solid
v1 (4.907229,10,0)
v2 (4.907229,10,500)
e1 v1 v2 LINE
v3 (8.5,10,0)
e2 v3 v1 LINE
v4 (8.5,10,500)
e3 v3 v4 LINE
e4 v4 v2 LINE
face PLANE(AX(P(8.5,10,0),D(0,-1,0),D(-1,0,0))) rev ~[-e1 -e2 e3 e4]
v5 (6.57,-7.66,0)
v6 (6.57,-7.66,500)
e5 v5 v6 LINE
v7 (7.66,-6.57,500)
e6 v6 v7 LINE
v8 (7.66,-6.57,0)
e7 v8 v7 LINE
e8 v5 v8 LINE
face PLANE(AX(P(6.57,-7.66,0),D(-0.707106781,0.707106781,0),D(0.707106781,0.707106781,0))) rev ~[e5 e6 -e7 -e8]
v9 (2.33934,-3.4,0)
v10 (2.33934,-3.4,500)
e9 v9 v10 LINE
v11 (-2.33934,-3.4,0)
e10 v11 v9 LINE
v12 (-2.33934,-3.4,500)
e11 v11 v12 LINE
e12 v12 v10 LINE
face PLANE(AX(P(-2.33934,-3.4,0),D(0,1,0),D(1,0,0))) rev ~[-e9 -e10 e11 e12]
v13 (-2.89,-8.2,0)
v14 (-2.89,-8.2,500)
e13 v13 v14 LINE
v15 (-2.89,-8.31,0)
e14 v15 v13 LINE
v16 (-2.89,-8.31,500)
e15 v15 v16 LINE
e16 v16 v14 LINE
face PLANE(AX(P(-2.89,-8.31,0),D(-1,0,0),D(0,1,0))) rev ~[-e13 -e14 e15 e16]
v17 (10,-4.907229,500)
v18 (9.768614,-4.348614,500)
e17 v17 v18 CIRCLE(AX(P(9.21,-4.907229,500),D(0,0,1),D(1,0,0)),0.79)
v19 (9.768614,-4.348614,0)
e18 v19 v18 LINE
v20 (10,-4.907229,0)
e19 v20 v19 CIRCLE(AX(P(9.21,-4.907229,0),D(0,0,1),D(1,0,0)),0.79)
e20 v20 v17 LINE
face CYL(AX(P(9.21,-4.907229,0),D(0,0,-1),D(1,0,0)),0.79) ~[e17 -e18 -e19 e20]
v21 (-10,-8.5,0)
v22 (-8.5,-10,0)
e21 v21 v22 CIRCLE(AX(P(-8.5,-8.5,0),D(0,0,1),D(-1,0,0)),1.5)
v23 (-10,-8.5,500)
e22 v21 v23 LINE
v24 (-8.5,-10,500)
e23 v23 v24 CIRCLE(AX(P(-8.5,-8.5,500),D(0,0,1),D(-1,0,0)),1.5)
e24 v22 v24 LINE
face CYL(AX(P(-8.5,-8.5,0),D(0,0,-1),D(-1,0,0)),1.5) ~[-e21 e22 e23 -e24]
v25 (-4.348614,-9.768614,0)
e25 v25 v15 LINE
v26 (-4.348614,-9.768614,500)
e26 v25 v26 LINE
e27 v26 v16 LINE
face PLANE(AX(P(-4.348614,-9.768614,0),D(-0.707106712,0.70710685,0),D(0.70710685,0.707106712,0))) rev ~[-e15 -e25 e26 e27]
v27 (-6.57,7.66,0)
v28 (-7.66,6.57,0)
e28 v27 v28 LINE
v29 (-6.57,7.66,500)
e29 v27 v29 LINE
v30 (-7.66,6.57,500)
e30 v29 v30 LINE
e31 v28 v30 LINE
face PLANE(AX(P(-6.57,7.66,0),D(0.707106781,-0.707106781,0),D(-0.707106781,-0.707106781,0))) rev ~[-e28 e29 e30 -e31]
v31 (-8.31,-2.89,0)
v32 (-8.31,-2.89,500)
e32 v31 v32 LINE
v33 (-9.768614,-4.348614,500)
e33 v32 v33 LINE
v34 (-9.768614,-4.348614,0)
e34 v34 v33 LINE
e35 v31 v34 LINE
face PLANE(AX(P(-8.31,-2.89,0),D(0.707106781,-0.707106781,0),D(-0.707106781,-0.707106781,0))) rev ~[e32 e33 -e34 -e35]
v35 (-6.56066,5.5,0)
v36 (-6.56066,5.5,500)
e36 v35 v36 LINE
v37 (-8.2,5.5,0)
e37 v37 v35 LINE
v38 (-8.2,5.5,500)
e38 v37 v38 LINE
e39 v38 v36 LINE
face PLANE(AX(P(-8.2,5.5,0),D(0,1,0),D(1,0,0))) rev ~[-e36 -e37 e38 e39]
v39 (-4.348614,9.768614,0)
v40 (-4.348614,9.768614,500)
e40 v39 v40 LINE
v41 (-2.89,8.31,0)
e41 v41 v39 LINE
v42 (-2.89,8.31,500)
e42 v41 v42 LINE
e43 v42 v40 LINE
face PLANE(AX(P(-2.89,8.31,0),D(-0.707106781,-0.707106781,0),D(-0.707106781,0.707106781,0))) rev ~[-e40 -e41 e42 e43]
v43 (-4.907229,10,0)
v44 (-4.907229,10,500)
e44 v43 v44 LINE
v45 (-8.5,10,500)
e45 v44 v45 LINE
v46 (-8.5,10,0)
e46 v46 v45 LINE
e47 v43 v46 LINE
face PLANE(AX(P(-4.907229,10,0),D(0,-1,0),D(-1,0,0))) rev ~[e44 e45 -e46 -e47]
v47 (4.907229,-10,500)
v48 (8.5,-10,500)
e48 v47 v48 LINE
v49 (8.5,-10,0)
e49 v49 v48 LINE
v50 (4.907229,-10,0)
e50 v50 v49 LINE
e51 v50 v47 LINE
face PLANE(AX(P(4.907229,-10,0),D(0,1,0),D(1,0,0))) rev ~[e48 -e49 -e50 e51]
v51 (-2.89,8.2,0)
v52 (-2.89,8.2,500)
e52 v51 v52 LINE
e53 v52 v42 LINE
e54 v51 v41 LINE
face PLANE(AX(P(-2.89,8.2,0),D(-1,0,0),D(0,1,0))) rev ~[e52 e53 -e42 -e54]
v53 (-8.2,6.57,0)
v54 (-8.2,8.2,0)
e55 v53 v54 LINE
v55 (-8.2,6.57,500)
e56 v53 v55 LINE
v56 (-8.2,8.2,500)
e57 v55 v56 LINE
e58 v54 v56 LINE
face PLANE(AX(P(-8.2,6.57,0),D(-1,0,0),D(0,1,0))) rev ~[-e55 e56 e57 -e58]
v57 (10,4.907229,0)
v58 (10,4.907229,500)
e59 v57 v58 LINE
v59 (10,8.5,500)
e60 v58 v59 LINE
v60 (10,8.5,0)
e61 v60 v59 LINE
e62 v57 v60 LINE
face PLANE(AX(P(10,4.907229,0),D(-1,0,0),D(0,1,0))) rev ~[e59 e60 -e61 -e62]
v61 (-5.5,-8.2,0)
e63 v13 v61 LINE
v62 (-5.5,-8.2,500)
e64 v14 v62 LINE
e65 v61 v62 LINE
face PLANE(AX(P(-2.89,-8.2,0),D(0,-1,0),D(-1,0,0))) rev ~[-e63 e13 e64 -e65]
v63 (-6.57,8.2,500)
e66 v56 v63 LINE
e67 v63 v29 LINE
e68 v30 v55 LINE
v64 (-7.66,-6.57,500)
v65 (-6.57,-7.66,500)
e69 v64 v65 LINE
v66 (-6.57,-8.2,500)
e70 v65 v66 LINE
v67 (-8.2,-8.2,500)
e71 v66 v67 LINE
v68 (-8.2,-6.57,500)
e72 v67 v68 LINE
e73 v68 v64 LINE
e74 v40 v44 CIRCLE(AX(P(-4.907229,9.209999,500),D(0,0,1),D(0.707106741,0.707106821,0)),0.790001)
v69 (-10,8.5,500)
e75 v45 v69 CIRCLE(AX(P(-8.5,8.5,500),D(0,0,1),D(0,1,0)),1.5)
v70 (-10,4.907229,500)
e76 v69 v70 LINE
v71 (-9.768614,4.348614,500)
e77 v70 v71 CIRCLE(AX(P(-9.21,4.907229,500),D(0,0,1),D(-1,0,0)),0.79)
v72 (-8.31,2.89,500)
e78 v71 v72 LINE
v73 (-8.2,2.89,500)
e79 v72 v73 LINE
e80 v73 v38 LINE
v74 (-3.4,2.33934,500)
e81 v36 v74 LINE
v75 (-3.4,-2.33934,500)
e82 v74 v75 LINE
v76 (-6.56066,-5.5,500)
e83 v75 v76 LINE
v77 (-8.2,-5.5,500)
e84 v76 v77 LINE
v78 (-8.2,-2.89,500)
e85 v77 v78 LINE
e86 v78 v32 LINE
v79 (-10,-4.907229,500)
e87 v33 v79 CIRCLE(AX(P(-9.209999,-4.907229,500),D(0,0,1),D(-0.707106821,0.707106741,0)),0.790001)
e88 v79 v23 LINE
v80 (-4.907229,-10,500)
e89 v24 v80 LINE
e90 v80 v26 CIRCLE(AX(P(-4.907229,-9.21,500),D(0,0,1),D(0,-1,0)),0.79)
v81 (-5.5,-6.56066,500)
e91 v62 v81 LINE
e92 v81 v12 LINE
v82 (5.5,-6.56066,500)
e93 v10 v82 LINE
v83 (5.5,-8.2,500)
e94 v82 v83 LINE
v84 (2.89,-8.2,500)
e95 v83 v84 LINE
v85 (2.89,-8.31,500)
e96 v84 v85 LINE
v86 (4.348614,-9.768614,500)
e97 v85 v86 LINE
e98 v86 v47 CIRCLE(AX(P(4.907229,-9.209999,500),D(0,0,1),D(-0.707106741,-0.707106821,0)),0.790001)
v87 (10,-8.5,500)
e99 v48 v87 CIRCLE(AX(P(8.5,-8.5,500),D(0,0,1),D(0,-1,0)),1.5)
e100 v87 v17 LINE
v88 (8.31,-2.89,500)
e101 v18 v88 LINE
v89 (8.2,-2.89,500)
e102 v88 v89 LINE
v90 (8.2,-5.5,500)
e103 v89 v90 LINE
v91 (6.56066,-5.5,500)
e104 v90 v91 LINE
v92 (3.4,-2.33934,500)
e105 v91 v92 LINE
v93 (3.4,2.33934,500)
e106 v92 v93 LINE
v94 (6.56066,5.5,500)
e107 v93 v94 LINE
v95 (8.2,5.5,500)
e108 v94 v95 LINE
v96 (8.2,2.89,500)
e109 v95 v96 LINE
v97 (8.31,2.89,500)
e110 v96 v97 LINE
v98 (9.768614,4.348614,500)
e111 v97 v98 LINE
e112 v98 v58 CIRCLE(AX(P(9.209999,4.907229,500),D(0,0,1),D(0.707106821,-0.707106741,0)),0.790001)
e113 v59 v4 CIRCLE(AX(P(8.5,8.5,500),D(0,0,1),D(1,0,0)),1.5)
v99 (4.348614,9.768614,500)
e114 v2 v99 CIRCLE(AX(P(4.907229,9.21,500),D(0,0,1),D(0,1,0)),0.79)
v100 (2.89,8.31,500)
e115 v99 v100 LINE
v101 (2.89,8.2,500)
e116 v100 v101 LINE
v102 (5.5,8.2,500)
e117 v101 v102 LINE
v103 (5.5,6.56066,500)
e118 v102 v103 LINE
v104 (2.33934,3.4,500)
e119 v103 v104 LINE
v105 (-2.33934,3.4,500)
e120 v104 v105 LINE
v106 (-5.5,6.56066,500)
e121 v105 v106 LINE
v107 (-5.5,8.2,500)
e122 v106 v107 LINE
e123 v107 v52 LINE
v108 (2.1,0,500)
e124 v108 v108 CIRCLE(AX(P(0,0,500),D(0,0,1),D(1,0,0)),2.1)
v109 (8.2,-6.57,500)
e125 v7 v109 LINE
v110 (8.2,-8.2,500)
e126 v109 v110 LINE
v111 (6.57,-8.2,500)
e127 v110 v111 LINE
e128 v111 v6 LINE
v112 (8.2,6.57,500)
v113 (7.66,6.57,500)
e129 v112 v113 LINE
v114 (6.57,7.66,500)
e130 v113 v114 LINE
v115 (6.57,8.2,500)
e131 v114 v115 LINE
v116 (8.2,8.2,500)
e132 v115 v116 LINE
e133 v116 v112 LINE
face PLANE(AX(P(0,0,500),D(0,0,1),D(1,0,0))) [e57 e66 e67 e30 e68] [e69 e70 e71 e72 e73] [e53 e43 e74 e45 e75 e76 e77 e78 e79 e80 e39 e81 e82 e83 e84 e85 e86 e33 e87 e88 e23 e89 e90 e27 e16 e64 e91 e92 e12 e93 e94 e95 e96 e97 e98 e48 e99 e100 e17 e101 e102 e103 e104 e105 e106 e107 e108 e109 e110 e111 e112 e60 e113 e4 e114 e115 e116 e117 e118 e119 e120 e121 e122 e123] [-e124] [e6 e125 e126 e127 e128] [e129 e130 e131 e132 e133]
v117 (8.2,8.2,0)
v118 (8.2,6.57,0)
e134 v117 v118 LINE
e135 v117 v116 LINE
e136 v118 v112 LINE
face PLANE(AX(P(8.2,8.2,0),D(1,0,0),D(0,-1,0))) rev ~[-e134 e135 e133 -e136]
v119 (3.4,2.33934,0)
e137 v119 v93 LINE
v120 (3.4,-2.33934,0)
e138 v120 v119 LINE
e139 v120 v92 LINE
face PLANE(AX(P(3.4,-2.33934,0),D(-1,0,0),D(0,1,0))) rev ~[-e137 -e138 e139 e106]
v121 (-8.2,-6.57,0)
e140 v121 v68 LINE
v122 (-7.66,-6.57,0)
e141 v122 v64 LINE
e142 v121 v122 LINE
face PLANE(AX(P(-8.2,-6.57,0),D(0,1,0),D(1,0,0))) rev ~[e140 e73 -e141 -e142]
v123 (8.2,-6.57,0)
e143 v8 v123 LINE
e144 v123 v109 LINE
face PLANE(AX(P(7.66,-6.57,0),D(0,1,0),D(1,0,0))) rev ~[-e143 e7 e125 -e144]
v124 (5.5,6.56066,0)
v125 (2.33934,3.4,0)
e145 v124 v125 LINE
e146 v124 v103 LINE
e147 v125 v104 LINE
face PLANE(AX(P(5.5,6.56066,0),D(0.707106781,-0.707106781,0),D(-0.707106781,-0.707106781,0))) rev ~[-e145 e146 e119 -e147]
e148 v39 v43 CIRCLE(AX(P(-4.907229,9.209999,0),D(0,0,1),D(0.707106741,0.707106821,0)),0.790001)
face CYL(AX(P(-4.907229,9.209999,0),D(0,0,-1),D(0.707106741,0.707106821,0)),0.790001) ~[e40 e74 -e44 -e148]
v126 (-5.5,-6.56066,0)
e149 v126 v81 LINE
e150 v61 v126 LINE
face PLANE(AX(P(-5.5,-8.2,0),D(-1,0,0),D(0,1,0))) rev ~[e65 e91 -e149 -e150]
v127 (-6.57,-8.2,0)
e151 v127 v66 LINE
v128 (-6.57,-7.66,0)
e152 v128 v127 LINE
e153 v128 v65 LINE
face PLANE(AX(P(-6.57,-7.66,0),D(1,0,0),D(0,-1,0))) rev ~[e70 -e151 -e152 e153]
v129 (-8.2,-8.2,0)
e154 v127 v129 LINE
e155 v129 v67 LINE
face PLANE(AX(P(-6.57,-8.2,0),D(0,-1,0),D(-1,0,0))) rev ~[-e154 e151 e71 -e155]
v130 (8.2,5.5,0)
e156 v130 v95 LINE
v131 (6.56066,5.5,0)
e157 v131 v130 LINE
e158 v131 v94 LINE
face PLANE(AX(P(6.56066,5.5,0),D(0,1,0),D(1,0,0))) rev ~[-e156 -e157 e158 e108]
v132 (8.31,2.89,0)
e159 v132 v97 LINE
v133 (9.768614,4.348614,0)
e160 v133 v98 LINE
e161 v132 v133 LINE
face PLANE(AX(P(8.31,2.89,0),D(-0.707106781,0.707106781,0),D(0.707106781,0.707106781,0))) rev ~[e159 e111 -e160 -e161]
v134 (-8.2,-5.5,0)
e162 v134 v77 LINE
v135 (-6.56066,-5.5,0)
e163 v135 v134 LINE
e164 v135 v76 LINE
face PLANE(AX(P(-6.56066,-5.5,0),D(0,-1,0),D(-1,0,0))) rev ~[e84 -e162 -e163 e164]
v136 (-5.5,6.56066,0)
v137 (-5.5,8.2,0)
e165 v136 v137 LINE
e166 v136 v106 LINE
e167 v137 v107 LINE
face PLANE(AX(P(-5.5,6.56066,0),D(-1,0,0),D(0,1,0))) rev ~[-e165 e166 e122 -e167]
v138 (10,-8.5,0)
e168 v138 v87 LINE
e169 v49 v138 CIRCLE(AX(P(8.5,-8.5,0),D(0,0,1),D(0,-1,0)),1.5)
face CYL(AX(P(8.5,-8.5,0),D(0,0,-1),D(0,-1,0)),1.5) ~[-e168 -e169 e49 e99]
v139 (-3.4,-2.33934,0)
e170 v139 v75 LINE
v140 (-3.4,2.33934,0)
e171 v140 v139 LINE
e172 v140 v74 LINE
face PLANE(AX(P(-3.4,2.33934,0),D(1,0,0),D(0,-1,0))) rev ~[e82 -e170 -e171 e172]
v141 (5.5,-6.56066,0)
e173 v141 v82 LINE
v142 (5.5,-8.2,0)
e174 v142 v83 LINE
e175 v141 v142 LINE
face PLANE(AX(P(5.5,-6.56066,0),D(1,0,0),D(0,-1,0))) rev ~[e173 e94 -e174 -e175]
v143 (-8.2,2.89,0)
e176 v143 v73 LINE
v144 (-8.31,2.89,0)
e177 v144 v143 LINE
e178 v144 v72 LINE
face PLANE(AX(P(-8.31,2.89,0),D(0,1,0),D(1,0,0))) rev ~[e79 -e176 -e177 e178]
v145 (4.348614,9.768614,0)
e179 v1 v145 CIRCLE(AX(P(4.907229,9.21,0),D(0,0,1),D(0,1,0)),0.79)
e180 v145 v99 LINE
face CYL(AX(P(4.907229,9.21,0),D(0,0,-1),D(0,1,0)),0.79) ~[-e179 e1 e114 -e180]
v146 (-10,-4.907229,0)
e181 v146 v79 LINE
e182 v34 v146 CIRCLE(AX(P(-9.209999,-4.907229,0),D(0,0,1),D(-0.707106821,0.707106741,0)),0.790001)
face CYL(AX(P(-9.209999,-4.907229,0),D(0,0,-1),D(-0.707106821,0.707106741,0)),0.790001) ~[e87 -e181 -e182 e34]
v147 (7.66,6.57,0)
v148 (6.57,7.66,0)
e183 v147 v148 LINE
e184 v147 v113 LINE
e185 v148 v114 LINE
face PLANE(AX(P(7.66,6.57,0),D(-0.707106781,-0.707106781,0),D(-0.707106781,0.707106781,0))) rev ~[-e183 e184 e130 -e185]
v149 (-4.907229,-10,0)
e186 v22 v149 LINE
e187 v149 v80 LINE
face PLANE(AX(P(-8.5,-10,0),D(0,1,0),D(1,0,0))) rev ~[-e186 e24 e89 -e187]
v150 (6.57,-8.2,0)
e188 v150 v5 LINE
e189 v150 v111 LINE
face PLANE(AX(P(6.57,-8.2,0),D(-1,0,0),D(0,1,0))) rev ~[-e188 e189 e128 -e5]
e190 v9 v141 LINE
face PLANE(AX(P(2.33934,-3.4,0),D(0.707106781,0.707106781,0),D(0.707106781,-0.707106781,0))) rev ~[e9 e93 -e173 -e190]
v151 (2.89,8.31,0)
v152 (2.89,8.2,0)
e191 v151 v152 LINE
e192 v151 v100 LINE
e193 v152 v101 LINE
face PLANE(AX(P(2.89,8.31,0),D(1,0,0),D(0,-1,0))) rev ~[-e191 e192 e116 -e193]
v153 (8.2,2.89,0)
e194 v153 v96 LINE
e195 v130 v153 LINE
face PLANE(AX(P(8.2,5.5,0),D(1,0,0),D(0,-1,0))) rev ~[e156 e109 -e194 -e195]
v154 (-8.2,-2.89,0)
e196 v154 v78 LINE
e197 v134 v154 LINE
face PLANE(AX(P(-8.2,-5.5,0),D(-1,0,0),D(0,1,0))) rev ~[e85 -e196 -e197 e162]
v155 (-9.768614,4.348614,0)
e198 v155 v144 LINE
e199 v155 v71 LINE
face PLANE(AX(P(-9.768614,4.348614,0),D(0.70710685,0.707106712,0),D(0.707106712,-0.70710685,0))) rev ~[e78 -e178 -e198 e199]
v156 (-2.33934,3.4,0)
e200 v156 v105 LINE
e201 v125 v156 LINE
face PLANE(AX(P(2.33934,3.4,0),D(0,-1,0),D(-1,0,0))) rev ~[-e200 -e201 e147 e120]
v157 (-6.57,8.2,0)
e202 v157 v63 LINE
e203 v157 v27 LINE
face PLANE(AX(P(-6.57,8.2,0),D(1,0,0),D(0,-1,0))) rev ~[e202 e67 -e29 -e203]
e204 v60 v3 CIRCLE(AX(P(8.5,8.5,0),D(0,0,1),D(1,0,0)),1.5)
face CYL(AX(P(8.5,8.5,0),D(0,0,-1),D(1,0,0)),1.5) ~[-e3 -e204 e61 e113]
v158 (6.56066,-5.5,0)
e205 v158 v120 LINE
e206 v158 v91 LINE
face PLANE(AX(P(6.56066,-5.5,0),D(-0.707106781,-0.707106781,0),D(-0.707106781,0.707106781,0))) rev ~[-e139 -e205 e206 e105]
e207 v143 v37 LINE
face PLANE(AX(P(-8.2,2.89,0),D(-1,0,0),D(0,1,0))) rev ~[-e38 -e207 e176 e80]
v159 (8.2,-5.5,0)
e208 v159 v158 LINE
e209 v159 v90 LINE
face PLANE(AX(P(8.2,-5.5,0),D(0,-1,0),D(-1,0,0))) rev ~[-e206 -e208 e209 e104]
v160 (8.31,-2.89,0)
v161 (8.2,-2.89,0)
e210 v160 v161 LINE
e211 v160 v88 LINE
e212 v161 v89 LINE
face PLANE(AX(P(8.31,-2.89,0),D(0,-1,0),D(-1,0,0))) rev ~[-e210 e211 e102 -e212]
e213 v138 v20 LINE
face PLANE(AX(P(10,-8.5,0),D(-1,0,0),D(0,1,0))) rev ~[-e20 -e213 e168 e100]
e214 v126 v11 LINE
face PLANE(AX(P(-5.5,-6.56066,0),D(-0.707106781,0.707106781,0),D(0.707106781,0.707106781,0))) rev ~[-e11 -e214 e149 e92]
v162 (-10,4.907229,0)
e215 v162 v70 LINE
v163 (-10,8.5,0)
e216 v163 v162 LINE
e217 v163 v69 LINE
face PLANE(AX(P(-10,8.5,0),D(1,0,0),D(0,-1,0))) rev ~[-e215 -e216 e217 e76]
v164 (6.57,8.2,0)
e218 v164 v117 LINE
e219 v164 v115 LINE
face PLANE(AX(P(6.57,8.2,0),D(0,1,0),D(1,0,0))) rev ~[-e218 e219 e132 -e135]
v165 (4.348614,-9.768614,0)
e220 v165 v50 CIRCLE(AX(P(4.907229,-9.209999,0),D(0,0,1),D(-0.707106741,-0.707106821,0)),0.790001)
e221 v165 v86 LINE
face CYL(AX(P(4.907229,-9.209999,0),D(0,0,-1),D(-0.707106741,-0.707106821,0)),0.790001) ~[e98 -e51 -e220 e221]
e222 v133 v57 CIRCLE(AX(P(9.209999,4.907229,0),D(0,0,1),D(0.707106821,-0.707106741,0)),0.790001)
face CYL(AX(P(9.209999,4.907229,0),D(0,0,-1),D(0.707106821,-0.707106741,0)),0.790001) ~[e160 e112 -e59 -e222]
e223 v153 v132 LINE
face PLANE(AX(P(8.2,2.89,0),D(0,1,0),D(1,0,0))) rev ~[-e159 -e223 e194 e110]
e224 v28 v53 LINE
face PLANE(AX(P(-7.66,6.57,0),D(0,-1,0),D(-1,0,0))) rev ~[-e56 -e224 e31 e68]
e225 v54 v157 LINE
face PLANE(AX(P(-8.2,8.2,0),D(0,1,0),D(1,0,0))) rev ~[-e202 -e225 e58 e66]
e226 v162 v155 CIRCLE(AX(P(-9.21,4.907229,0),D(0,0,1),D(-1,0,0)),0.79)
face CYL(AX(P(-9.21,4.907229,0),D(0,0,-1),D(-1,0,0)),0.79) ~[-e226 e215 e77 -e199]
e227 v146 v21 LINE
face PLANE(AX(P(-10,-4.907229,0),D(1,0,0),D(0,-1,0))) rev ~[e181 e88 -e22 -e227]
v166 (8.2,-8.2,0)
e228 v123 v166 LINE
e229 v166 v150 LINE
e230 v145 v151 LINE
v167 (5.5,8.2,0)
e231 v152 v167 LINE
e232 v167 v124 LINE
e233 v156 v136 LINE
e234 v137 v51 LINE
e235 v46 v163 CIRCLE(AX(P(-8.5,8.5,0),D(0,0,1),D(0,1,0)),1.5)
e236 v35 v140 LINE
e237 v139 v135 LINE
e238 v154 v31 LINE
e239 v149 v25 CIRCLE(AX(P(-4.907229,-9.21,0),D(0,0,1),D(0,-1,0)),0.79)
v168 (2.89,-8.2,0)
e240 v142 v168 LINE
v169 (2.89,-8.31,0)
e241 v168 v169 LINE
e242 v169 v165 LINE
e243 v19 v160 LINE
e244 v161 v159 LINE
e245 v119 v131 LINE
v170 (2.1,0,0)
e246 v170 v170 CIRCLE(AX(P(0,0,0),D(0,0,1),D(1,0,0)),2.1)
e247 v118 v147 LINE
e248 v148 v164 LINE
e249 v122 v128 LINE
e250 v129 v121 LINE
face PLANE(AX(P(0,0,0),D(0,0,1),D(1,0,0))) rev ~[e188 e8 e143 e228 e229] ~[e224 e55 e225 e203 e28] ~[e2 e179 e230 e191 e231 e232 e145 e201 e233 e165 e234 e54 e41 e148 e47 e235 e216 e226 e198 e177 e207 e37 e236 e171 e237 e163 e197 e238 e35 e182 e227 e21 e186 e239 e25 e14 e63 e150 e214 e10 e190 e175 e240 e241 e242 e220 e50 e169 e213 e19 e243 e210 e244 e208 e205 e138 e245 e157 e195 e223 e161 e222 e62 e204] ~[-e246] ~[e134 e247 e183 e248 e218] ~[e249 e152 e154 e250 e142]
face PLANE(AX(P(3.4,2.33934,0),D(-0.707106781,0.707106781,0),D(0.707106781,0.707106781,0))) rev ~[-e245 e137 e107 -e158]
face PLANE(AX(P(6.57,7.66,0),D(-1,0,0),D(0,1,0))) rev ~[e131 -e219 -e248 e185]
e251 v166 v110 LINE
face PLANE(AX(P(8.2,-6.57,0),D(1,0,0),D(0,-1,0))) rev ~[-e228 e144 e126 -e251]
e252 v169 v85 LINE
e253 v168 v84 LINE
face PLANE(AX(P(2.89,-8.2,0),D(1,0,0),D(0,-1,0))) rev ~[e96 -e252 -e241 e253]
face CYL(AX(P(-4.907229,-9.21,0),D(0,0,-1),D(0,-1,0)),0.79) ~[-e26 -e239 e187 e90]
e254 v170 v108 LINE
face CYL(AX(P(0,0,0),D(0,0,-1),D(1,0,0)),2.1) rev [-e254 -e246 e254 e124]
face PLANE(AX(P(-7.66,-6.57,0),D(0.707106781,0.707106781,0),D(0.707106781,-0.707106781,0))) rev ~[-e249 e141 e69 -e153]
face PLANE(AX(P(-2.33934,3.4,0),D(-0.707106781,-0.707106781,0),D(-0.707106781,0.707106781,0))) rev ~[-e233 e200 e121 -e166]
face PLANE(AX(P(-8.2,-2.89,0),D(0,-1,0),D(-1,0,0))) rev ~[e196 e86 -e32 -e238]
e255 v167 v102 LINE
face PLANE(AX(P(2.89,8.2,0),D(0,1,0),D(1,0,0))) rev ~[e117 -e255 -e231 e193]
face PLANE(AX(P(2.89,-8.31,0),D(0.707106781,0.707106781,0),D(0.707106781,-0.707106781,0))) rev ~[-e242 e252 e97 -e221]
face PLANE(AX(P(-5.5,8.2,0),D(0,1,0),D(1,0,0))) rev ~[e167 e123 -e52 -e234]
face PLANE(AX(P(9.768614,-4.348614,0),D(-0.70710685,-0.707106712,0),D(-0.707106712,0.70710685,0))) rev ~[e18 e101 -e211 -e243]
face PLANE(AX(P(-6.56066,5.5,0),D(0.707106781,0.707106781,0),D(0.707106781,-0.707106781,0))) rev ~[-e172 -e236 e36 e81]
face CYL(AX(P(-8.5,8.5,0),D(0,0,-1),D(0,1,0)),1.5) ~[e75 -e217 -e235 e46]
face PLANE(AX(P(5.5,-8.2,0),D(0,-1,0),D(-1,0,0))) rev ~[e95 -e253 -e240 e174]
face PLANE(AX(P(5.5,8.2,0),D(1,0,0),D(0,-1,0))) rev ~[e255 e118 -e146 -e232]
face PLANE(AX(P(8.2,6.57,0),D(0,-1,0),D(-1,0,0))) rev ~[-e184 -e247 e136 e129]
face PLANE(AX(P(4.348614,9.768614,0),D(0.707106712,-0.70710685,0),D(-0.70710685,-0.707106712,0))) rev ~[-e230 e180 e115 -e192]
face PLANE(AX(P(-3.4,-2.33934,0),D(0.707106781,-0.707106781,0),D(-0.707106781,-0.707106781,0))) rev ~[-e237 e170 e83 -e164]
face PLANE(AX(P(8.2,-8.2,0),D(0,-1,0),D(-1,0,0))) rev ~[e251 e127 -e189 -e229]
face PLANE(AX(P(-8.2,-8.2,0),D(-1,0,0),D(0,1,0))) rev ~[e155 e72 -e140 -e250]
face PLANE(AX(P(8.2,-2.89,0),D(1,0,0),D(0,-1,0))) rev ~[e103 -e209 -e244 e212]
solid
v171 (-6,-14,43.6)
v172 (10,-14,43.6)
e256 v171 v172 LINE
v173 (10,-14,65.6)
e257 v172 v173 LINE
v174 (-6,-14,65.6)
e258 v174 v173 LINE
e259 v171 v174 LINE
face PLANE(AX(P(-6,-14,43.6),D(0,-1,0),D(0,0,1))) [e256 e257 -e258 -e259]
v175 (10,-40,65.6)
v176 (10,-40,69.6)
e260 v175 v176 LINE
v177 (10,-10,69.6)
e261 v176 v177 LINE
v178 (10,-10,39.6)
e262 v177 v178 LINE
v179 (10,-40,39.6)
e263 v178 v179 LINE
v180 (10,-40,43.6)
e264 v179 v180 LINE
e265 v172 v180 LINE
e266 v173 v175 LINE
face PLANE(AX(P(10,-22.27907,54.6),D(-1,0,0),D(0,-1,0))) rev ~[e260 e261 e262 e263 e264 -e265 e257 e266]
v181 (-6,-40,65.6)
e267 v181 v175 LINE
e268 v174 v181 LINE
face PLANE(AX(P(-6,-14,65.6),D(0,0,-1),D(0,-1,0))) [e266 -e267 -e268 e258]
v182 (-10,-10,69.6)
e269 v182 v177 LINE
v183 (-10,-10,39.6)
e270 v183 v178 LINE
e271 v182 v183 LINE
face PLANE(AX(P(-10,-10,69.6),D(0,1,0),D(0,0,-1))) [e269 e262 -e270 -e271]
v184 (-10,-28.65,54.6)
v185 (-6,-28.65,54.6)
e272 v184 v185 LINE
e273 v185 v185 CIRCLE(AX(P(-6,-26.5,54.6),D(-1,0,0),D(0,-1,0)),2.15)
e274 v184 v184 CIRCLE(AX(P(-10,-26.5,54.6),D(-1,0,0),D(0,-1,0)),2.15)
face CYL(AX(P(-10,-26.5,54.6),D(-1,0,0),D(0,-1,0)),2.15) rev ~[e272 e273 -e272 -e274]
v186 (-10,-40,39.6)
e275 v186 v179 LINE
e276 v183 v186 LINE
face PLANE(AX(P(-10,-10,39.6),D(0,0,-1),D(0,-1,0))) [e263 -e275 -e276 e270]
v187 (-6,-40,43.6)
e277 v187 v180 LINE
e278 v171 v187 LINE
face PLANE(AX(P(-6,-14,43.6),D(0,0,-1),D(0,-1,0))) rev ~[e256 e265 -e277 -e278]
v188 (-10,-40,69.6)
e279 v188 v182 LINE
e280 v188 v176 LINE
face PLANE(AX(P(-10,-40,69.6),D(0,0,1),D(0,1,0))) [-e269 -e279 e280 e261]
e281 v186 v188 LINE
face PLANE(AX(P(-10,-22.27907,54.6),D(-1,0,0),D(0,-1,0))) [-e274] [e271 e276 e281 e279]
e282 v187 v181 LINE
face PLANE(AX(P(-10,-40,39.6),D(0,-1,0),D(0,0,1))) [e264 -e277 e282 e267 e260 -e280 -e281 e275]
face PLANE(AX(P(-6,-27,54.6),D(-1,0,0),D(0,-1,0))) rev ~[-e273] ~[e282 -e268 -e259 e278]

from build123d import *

# Parameters (mm, degrees)
F0_R     = 2.1
F1_DEPTH = 500
F3_W     = 26
F3_H     = 22
F3_R     = 2.15
F4_DEPTH = 20
F7_START = -4
F7_DEPTH = 16


# Not quite as in the source:
# - ends of sketch curves that miss each other by under 0.0002 mm in the source are joined
# - a feature of the source that left no trace in its solid (it failed there, or was rolled back) is left out


with BuildPart() as f1:
    # F0 (on Top) → F1 (new body)
    with BuildSketch(Plane.XY):
        with BuildLine():
            Line((-8.2, 5.5), (-6.56066, 5.5))
            Line((-6.56066, 5.5), (-3.4, 2.33934))
            Line((-3.4, 2.33934), (-3.4, -2.33934))
            Line((-3.4, -2.33934), (-6.56066, -5.5))
            Line((-6.56066, -5.5), (-8.2, -5.5))
            Line((-8.2, -5.5), (-8.2, -2.89))
            Line((-8.2, -2.89), (-8.31, -2.89))
            Line((-8.31, -2.89), (-9.768614, -4.348614))
            ThreePointArc((-9.768614, -4.348614), (-9.9398646954, -4.6049087618), (-10, -4.907229))
            Line((-10, -4.907229), (-10, -8.5))
            ThreePointArc((-10, -8.5), (-9.5606601718, -9.5606601718), (-8.5, -10))
            Line((-8.5, -10), (-4.907229, -10))
            ThreePointArc((-4.907229, -10), (-4.6049087618, -9.9398646954), (-4.3486141429, -9.7686138571))
            Line((-4.3486141429, -9.7686138571), (-2.89, -8.31))
            Line((-2.89, -8.31), (-2.89, -8.2))
            Line((-2.89, -8.2), (-5.5, -8.2))
            Line((-5.5, -8.2), (-5.5, -6.56066))
            Line((-5.5, -6.56066), (-2.33934, -3.4))
            Line((-2.33934, -3.4), (2.33934, -3.4))
            Line((2.33934, -3.4), (5.5, -6.56066))
            Line((5.5, -6.56066), (5.5, -8.2))
            Line((5.5, -8.2), (2.89, -8.2))
            Line((2.89, -8.2), (2.89, -8.31))
            Line((2.89, -8.31), (4.348614, -9.768614))
            ThreePointArc((4.348614, -9.768614), (4.6049087618, -9.9398646954), (4.907229, -10))
            Line((4.907229, -10), (8.5, -10))
            ThreePointArc((8.5, -10), (9.5606601718, -9.5606601718), (10, -8.5))
            Line((10, -8.5), (10, -4.907229))
            ThreePointArc((10, -4.907229), (9.9398646954, -4.6049087618), (9.7686138571, -4.3486141429))
            Line((9.7686138571, -4.3486141429), (8.31, -2.89))
            Line((8.31, -2.89), (8.2, -2.89))
            Line((8.2, -2.89), (8.2, -5.5))
            Line((8.2, -5.5), (6.56066, -5.5))
            Line((6.56066, -5.5), (3.4, -2.33934))
            Line((3.4, -2.33934), (3.4, 2.33934))
            Line((3.4, 2.33934), (6.56066, 5.5))
            Line((6.56066, 5.5), (8.2, 5.5))
            Line((8.2, 5.5), (8.2, 2.89))
            Line((8.2, 2.89), (8.31, 2.89))
            Line((8.31, 2.89), (9.768614, 4.348614))
            ThreePointArc((9.768614, 4.348614), (9.9398646954, 4.6049087618), (10, 4.907229))
            Line((10, 4.907229), (10, 8.5))
            ThreePointArc((10, 8.5), (9.5606601718, 9.5606601718), (8.5, 10))
            Line((8.5, 10), (4.907229, 10))
            ThreePointArc((4.907229, 10), (4.6049087618, 9.9398646954), (4.3486141429, 9.7686138571))
            Line((4.3486141429, 9.7686138571), (2.89, 8.31))
            Line((2.89, 8.31), (2.89, 8.2))
            Line((2.89, 8.2), (5.5, 8.2))
            Line((5.5, 8.2), (5.5, 6.56066))
            Line((5.5, 6.56066), (2.33934, 3.4))
            Line((2.33934, 3.4), (-2.33934, 3.4))
            Line((-2.33934, 3.4), (-5.5, 6.56066))
            Line((-5.5, 6.56066), (-5.5, 8.2))
            Line((-5.5, 8.2), (-2.89, 8.2))
            Line((-2.89, 8.2), (-2.89, 8.31))
            Line((-2.89, 8.31), (-4.348614, 9.768614))
            ThreePointArc((-4.348614, 9.768614), (-4.6049087618, 9.9398646954), (-4.907229, 10))
            Line((-4.907229, 10), (-8.5, 10))
            ThreePointArc((-8.5, 10), (-9.5606601718, 9.5606601718), (-10, 8.5))
            Line((-10, 8.5), (-10, 4.907229))
            ThreePointArc((-10, 4.907229), (-9.9398646954, 4.6049087618), (-9.7686138571, 4.3486141429))
            Line((-9.7686138571, 4.3486141429), (-8.31, 2.89))
            Line((-8.31, 2.89), (-8.2, 2.89))
            Line((-8.2, 2.89), (-8.2, 5.5))
        make_face()
        Polygon((-6.57, -8.2), (-8.2, -8.2), (-8.2, -6.57), (-7.66, -6.57), (-6.57, -7.66), align=None, mode=Mode.SUBTRACT)
        Polygon((6.57, -7.66), (7.66, -6.57), (8.2, -6.57), (8.2, -8.2), (6.57, -8.2), align=None, mode=Mode.SUBTRACT)
        Polygon((-6.57, 7.66), (-7.66, 6.57), (-8.2, 6.57), (-8.2, 8.2), (-6.57, 8.2), align=None, mode=Mode.SUBTRACT)
        Circle(F0_R, mode=Mode.SUBTRACT)
        Polygon((6.57, 8.2), (8.2, 8.2), (8.2, 6.57), (7.66, 6.57), (6.57, 7.66), align=None, mode=Mode.SUBTRACT)
    extrude(amount=F1_DEPTH)


with BuildPart() as f4:
    # F3 (on face) → F4 (new body)
    with BuildSketch(Plane(origin=(-10, 0, 0), x_dir=(0, -1, 0), z_dir=(-1, 0, 0))):
        Polygon((40, 69.6), (10, 69.6), (10, 39.6), (40, 39.6), (40, 43.6), (14, 43.6), (14, 65.6), (40, 65.6), align=None)
        with Locations((27, 54.6)):
            Rectangle(F3_W, F3_H)
        with Locations((26.5, 54.6)):
            Circle(F3_R, mode=Mode.SUBTRACT)
    extrude(amount=-F4_DEPTH)

    # F3 (on face) → F7 (cut)
    with BuildSketch(Plane(origin=(-10, 0, 0), x_dir=(0, -1, 0), z_dir=(-1, 0, 0)).offset(F7_START)):
        with Locations((27, 54.6)):
            Rectangle(F3_W, F3_H)
        with Locations((26.5, 54.6)):
            Circle(F3_R, mode=Mode.SUBTRACT)
    extrude(amount=-F7_DEPTH, mode=Mode.SUBTRACT)


solid = Compound([f1.part, f4.part])
